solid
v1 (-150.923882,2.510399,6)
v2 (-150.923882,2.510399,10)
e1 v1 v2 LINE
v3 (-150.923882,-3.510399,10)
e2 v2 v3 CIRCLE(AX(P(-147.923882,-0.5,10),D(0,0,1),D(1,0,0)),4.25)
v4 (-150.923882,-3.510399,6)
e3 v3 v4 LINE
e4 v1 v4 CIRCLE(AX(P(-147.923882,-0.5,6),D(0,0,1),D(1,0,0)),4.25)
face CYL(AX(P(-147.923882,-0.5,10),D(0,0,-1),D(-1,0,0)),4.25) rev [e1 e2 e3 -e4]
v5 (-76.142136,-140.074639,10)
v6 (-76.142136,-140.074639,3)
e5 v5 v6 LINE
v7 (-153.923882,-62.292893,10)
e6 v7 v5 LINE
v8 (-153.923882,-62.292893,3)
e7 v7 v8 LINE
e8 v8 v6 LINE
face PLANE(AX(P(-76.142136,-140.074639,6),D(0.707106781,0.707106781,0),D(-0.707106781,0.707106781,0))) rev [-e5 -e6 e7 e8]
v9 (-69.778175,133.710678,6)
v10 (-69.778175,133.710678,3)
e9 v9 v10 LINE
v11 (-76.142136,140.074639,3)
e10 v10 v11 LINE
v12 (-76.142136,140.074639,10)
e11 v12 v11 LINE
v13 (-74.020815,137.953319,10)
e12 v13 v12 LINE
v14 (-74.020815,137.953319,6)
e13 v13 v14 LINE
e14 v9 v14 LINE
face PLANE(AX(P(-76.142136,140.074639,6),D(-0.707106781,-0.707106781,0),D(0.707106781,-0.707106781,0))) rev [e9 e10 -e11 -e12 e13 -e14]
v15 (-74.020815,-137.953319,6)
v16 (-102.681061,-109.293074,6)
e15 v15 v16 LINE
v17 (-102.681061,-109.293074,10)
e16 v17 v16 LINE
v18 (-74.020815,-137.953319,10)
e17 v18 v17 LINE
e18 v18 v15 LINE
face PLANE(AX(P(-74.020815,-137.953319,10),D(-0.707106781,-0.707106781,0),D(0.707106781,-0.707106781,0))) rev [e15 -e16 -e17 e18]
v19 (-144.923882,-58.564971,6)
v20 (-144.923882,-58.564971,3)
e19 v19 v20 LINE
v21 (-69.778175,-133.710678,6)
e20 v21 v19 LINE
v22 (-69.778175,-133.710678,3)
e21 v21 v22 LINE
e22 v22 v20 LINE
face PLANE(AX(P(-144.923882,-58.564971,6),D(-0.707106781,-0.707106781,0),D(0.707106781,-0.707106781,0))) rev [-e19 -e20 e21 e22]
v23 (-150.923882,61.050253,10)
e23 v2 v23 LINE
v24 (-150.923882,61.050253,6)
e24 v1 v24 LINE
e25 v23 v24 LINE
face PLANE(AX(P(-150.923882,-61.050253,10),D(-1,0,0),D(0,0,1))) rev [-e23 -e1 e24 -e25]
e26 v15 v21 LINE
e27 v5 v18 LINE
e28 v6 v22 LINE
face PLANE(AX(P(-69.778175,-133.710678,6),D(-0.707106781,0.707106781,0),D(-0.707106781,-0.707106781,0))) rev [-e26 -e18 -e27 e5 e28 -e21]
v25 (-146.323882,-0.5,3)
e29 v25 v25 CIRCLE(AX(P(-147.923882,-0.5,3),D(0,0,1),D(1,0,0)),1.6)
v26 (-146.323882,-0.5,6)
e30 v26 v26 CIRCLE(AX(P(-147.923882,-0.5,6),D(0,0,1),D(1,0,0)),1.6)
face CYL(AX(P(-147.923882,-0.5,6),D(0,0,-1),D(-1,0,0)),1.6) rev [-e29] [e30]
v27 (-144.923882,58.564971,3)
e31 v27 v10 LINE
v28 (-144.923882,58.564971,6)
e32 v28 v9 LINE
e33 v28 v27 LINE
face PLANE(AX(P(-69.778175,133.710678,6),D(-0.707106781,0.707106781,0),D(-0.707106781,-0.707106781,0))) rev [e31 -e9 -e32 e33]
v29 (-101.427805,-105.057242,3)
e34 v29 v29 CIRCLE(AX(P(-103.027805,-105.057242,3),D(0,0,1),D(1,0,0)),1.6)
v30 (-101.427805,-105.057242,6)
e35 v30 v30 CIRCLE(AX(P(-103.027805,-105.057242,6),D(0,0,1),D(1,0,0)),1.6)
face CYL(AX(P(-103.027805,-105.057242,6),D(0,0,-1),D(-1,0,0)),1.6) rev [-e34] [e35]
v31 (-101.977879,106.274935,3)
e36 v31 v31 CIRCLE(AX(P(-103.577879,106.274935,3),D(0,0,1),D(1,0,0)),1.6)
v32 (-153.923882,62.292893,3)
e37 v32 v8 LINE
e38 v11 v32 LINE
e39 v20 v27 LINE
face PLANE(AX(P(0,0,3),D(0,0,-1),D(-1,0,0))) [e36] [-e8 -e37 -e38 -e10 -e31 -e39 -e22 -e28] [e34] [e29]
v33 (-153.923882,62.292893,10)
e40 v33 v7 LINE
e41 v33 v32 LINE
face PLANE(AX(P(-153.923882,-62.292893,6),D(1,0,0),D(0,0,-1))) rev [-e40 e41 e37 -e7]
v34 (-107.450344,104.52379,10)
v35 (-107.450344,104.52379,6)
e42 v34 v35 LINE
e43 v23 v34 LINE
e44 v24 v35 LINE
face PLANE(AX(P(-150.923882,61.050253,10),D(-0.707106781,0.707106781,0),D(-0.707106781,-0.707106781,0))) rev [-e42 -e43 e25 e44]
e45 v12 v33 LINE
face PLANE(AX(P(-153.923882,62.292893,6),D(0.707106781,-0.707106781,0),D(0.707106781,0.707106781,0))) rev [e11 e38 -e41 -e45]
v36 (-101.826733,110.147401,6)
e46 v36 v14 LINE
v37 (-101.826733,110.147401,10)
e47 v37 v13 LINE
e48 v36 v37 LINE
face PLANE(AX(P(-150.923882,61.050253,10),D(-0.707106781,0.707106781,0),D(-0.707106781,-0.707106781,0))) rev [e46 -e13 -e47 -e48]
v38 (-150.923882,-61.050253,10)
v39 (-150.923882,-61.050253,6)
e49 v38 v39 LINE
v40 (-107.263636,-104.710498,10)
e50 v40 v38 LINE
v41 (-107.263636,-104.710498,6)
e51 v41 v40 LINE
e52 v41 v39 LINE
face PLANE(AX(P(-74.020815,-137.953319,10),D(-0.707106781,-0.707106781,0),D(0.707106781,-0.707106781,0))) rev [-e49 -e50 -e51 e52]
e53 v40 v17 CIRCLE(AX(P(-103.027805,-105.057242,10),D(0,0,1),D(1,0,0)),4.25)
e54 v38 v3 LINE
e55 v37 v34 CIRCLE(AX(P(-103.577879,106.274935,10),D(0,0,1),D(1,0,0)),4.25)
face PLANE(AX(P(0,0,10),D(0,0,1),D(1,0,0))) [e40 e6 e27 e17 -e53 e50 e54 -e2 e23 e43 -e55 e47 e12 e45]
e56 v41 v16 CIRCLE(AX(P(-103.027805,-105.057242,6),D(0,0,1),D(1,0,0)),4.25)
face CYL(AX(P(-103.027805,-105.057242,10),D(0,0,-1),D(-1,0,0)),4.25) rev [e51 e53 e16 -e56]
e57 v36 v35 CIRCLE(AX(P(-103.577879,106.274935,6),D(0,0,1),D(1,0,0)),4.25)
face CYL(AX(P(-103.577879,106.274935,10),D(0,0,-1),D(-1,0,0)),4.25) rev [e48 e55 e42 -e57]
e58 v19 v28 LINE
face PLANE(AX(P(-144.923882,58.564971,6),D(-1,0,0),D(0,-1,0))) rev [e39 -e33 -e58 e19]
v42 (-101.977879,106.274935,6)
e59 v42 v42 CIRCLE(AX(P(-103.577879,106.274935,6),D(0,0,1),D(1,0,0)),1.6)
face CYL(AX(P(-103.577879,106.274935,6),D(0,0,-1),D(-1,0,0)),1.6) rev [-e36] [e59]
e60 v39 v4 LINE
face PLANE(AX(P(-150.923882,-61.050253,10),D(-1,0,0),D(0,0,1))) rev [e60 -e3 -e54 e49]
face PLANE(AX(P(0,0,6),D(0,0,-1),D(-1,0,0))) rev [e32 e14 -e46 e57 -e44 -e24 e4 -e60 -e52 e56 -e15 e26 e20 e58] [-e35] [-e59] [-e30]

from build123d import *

# Parameters (mm, degrees)
SHEET_EXTRUSION_DEPTH           = 3
ESQUISSE_TROU_ROUE_DROITE_W     = 70
ESQUISSE_TROU_ROUE_DROITE_H     = 40
LEFTWHEEL_EXTRUSION_DEPTH       = 219.408952171
ESQUISSE20_W                    = 30
ESQUISSE20_H                    = 17
LEFTFREEWHEEL_HOLE_DEPTH        = 219.408952171
LEFTWHEEL_FIX_OUTLINE_R         = 2.5
LEFTWHEEL_FIX_DEPTH             = 3
BALL_EXTRUSION_OUTLINE_R        = 12
BALL_EXTRUSION_DEPTH            = 3
ARROUND_FIX_EXTRUSION_OUTLINE_R = 2.5
ARROUND_FIX_EXTRUSION_DEPTH     = 3
LEFT_PROFILE_HOLE_OUTLINE_R     = 2.5
LEFT_PROFILE_HOLE_DEPTH         = 3
LEFT_FIX_MECA_SKETCH_R          = 1.5
LEFT_FIX_MECA_EXTRUSION_DEPTH   = 219.408952171
LEFT_CODER_HOLES_SKETCH_R       = 1.5
LEFT_CODER_HOLES_DEPTH          = 219.408952171
BOTTOM_FIX_HOLES_SKETCH_R       = 1.5
RIGHT_FIX_MECA_HOLES_DEPTH      = 219.408952171
SKETCH1_R                       = 1.6
BOSS_EXTRUDE1_DEPTH             = 3
BOSS_EXTRUDE2_DEPTH             = 4
SKETCH2_W                       = 3
SKETCH2_H                       = 308.847763108
CUT_EXTRUDE1_DEPTH              = 269.911228609
SKETCH3_R                       = 4.25
CUT_EXTRUDE4_DEPTH              = 209.157310334


# Read off the part's stored shape, not the designer's step: LeftWheel-Fix, Ball-Extrusion, Arround-Fix-Extrusion, Left-Profile-Hole
with BuildPart() as part:
    # Sheet-Sketch → Sheet-Extrusion (new body)
    with BuildSketch(Plane.XY):
        Polygon((-62.5, 154.423881554), (62.5, 154.423881554), (65.5, 154.423881554), (65.5, 109.423881554), (39, 75), (20, 75), (20, -75), (39, -75), (65.5, -109.423881554), (65.5, -154.423881554), (62.5, -154.423881554), (-62.5, -154.423881554), (-154.423881554, -62.5), (-154.423881554, 62.5), align=None)
    extrude(amount=SHEET_EXTRUSION_DEPTH)

    # Esquisse Trou Roue Droite → LeftWheel-Extrusion (cut, through all)
    with BuildSketch(Plane.XY.offset(3)):
        with Locations((1.237734866, 107.423881554)):
            Rectangle(ESQUISSE_TROU_ROUE_DROITE_W, ESQUISSE_TROU_ROUE_DROITE_H)
    leftwheel_extrusion = extrude(amount=-LEFTWHEEL_EXTRUSION_DEPTH, mode=Mode.SUBTRACT)

    # Esquisse20 → LeftFreeWheel-Hole (cut, through all)
    with BuildSketch(Plane.XY.offset(3)):
        with Locations((1.402864765, 135.923881554)):
            Rectangle(ESQUISSE20_W, ESQUISSE20_H)
    leftfreewheel_hole = extrude(amount=-LEFTFREEWHEEL_HOLE_DEPTH, mode=Mode.SUBTRACT)

    # LeftWheel-Fix outline → LeftWheel-Fix (cut)
    with BuildSketch(Plane.XY):
        with Locations((0.388540939, 40)):
            Circle(LEFTWHEEL_FIX_OUTLINE_R)
    leftwheel_fix = extrude(amount=LEFTWHEEL_FIX_DEPTH, mode=Mode.SUBTRACT)

    # Ball-Extrusion outline → Ball-Extrusion (cut)
    with BuildSketch(Plane.XY):
        with Locations((-114.423881554, 0)):
            Circle(BALL_EXTRUSION_OUTLINE_R)
    extrude(amount=BALL_EXTRUSION_DEPTH, mode=Mode.SUBTRACT)

    # Arround-Fix-Extrusion outline → Arround-Fix-Extrusion (cut)
    with BuildSketch(Plane.XY):
        with Locations((60.248995228, 148.862139245)):
            Circle(ARROUND_FIX_EXTRUSION_OUTLINE_R)
        with Locations((-60.248995228, 148.862139245)):
            Circle(ARROUND_FIX_EXTRUSION_OUTLINE_R)
        with Locations((-148.862139245, 60.248995228)):
            Circle(ARROUND_FIX_EXTRUSION_OUTLINE_R)
    arround_fix_extrusion = extrude(amount=ARROUND_FIX_EXTRUSION_DEPTH, mode=Mode.SUBTRACT)

    # Left-Profile-Hole outline → Left-Profile-Hole (cut)
    with BuildSketch(Plane.XY):
        with Locations((-52.5, 144.423881554)):
            Circle(LEFT_PROFILE_HOLE_OUTLINE_R)
        with Locations((52.5, 144.423881554)):
            Circle(LEFT_PROFILE_HOLE_OUTLINE_R)
    left_profile_hole = extrude(amount=LEFT_PROFILE_HOLE_DEPTH, mode=Mode.SUBTRACT)

    # Left-Fix-Meca-Sketch → Left-Fix-Meca-Extrusion (cut, through all)
    with BuildSketch(Plane.XY.offset(3)):
        with Locations((27.801900038, 82.423881554)):
            Circle(LEFT_FIX_MECA_SKETCH_R)
        with Locations((58.5, 129.423881554)):
            Circle(LEFT_FIX_MECA_SKETCH_R)
    left_fix_meca_extrusion = extrude(amount=-LEFT_FIX_MECA_EXTRUSION_DEPTH, mode=Mode.SUBTRACT)

    # Left-Coder-Holes-Sketch → Left-Coder-Holes (cut, through all)
    with BuildSketch(Plane.XY.offset(3)):
        with Locations((-28.724826295, 131.423881554)):
            Circle(LEFT_CODER_HOLES_SKETCH_R)
        with Locations((31.275173705, 131.423881554)):
            Circle(LEFT_CODER_HOLES_SKETCH_R)
    left_coder_holes = extrude(amount=-LEFT_CODER_HOLES_DEPTH, mode=Mode.SUBTRACT)

    # Bottom-Fix-Holes-Sketch → Right-Fix-Meca-Holes (cut, through all)
    with BuildSketch(Plane.XY.offset(3)):
        with Locations((-104.353414534, 105.499399209)):
            Circle(BOTTOM_FIX_HOLES_SKETCH_R)
        with Locations((-85.741045982, 80.490778132)):
            Circle(BOTTOM_FIX_HOLES_SKETCH_R)
    right_fix_meca_holes = extrude(amount=-RIGHT_FIX_MECA_HOLES_DEPTH, mode=Mode.SUBTRACT)

    # Symetry-All-Pieces: LeftWheel-Extrusion, LeftFreeWheel-Hole, LeftWheel-Fix, Arround-Fix-Extrusion, Left-Profile-Hole, Left-Fix-Meca-Extrusion, Left-Coder-Holes, Right-Fix-Meca-Holes across plane
    add(leftwheel_extrusion.mirror(Plane.ZX), mode=Mode.SUBTRACT)
    add(leftfreewheel_hole.mirror(Plane.ZX), mode=Mode.SUBTRACT)
    add(leftwheel_fix.mirror(Plane.ZX), mode=Mode.SUBTRACT)
    add(arround_fix_extrusion.mirror(Plane.ZX), mode=Mode.SUBTRACT)
    add(left_profile_hole.mirror(Plane.ZX), mode=Mode.SUBTRACT)
    add(left_fix_meca_extrusion.mirror(Plane.ZX), mode=Mode.SUBTRACT)
    add(left_coder_holes.mirror(Plane.ZX), mode=Mode.SUBTRACT)
    add(right_fix_meca_holes.mirror(Plane.ZX), mode=Mode.SUBTRACT)

    # Sketch1 → Boss-Extrude1 (add)
    with BuildSketch(Plane.XY.offset(3)):
        Polygon((-76.142135624, 140.074639149), (-69.778174593, 133.710678119), (-144.923881554, 58.564971157), (-144.923881554, -58.564971157), (-69.778174593, -133.710678119), (-76.142135624, -140.074639149), (-153.923881554, -62.292893219), (-153.923881554, 62.292893219), align=None)
        with Locations((-147.923881554, -0.5)):
            Circle(SKETCH1_R, mode=Mode.SUBTRACT)
        with Locations(Location((-103.027804769, -105.05724202, 0), (0, 0, 138.844831023))):
            Circle(SKETCH1_R, mode=Mode.SUBTRACT)
        with Locations(Location((-103.577878734, 106.274935009, 0), (0, 0, 160.535415734))):
            Circle(SKETCH1_R, mode=Mode.SUBTRACT)
    extrude(amount=BOSS_EXTRUDE1_DEPTH)

    # Sketch4 → Boss-Extrude2 (add)
    with BuildSketch(Plane.XY.offset(6)):
        Polygon((-74.02081528, 137.953318806), (-76.142135624, 140.074639149), (-153.923881554, 62.292893219), (-153.923881554, -62.292893219), (-76.142135624, -140.074639149), (-74.02081528, -137.953318806), (-150.923881554, -61.050252532), (-150.923881554, 61.050252532), align=None)
    extrude(amount=BOSS_EXTRUDE2_DEPTH)

    # Sketch2 → Cut-Extrude1 (cut, through all)
    with BuildSketch(Plane.ZY.offset(154.423881554)):
        with Locations((1.5, 0)):
            Rectangle(SKETCH2_W, SKETCH2_H)
    extrude(amount=-CUT_EXTRUDE1_DEPTH, mode=Mode.SUBTRACT)

    # Sketch3 → Cut-Extrude4 (cut, through all)
    with BuildSketch(Plane.XY.offset(6)):
        with Locations((-147.923881554, -0.5)):
            Circle(SKETCH3_R)
        with Locations((-103.577878734, 106.274935009)):
            Circle(SKETCH3_R)
        with Locations((-103.027804769, -105.05724202)):
            Circle(SKETCH3_R)
    extrude(amount=CUT_EXTRUDE4_DEPTH, mode=Mode.SUBTRACT)


solid = part.part
